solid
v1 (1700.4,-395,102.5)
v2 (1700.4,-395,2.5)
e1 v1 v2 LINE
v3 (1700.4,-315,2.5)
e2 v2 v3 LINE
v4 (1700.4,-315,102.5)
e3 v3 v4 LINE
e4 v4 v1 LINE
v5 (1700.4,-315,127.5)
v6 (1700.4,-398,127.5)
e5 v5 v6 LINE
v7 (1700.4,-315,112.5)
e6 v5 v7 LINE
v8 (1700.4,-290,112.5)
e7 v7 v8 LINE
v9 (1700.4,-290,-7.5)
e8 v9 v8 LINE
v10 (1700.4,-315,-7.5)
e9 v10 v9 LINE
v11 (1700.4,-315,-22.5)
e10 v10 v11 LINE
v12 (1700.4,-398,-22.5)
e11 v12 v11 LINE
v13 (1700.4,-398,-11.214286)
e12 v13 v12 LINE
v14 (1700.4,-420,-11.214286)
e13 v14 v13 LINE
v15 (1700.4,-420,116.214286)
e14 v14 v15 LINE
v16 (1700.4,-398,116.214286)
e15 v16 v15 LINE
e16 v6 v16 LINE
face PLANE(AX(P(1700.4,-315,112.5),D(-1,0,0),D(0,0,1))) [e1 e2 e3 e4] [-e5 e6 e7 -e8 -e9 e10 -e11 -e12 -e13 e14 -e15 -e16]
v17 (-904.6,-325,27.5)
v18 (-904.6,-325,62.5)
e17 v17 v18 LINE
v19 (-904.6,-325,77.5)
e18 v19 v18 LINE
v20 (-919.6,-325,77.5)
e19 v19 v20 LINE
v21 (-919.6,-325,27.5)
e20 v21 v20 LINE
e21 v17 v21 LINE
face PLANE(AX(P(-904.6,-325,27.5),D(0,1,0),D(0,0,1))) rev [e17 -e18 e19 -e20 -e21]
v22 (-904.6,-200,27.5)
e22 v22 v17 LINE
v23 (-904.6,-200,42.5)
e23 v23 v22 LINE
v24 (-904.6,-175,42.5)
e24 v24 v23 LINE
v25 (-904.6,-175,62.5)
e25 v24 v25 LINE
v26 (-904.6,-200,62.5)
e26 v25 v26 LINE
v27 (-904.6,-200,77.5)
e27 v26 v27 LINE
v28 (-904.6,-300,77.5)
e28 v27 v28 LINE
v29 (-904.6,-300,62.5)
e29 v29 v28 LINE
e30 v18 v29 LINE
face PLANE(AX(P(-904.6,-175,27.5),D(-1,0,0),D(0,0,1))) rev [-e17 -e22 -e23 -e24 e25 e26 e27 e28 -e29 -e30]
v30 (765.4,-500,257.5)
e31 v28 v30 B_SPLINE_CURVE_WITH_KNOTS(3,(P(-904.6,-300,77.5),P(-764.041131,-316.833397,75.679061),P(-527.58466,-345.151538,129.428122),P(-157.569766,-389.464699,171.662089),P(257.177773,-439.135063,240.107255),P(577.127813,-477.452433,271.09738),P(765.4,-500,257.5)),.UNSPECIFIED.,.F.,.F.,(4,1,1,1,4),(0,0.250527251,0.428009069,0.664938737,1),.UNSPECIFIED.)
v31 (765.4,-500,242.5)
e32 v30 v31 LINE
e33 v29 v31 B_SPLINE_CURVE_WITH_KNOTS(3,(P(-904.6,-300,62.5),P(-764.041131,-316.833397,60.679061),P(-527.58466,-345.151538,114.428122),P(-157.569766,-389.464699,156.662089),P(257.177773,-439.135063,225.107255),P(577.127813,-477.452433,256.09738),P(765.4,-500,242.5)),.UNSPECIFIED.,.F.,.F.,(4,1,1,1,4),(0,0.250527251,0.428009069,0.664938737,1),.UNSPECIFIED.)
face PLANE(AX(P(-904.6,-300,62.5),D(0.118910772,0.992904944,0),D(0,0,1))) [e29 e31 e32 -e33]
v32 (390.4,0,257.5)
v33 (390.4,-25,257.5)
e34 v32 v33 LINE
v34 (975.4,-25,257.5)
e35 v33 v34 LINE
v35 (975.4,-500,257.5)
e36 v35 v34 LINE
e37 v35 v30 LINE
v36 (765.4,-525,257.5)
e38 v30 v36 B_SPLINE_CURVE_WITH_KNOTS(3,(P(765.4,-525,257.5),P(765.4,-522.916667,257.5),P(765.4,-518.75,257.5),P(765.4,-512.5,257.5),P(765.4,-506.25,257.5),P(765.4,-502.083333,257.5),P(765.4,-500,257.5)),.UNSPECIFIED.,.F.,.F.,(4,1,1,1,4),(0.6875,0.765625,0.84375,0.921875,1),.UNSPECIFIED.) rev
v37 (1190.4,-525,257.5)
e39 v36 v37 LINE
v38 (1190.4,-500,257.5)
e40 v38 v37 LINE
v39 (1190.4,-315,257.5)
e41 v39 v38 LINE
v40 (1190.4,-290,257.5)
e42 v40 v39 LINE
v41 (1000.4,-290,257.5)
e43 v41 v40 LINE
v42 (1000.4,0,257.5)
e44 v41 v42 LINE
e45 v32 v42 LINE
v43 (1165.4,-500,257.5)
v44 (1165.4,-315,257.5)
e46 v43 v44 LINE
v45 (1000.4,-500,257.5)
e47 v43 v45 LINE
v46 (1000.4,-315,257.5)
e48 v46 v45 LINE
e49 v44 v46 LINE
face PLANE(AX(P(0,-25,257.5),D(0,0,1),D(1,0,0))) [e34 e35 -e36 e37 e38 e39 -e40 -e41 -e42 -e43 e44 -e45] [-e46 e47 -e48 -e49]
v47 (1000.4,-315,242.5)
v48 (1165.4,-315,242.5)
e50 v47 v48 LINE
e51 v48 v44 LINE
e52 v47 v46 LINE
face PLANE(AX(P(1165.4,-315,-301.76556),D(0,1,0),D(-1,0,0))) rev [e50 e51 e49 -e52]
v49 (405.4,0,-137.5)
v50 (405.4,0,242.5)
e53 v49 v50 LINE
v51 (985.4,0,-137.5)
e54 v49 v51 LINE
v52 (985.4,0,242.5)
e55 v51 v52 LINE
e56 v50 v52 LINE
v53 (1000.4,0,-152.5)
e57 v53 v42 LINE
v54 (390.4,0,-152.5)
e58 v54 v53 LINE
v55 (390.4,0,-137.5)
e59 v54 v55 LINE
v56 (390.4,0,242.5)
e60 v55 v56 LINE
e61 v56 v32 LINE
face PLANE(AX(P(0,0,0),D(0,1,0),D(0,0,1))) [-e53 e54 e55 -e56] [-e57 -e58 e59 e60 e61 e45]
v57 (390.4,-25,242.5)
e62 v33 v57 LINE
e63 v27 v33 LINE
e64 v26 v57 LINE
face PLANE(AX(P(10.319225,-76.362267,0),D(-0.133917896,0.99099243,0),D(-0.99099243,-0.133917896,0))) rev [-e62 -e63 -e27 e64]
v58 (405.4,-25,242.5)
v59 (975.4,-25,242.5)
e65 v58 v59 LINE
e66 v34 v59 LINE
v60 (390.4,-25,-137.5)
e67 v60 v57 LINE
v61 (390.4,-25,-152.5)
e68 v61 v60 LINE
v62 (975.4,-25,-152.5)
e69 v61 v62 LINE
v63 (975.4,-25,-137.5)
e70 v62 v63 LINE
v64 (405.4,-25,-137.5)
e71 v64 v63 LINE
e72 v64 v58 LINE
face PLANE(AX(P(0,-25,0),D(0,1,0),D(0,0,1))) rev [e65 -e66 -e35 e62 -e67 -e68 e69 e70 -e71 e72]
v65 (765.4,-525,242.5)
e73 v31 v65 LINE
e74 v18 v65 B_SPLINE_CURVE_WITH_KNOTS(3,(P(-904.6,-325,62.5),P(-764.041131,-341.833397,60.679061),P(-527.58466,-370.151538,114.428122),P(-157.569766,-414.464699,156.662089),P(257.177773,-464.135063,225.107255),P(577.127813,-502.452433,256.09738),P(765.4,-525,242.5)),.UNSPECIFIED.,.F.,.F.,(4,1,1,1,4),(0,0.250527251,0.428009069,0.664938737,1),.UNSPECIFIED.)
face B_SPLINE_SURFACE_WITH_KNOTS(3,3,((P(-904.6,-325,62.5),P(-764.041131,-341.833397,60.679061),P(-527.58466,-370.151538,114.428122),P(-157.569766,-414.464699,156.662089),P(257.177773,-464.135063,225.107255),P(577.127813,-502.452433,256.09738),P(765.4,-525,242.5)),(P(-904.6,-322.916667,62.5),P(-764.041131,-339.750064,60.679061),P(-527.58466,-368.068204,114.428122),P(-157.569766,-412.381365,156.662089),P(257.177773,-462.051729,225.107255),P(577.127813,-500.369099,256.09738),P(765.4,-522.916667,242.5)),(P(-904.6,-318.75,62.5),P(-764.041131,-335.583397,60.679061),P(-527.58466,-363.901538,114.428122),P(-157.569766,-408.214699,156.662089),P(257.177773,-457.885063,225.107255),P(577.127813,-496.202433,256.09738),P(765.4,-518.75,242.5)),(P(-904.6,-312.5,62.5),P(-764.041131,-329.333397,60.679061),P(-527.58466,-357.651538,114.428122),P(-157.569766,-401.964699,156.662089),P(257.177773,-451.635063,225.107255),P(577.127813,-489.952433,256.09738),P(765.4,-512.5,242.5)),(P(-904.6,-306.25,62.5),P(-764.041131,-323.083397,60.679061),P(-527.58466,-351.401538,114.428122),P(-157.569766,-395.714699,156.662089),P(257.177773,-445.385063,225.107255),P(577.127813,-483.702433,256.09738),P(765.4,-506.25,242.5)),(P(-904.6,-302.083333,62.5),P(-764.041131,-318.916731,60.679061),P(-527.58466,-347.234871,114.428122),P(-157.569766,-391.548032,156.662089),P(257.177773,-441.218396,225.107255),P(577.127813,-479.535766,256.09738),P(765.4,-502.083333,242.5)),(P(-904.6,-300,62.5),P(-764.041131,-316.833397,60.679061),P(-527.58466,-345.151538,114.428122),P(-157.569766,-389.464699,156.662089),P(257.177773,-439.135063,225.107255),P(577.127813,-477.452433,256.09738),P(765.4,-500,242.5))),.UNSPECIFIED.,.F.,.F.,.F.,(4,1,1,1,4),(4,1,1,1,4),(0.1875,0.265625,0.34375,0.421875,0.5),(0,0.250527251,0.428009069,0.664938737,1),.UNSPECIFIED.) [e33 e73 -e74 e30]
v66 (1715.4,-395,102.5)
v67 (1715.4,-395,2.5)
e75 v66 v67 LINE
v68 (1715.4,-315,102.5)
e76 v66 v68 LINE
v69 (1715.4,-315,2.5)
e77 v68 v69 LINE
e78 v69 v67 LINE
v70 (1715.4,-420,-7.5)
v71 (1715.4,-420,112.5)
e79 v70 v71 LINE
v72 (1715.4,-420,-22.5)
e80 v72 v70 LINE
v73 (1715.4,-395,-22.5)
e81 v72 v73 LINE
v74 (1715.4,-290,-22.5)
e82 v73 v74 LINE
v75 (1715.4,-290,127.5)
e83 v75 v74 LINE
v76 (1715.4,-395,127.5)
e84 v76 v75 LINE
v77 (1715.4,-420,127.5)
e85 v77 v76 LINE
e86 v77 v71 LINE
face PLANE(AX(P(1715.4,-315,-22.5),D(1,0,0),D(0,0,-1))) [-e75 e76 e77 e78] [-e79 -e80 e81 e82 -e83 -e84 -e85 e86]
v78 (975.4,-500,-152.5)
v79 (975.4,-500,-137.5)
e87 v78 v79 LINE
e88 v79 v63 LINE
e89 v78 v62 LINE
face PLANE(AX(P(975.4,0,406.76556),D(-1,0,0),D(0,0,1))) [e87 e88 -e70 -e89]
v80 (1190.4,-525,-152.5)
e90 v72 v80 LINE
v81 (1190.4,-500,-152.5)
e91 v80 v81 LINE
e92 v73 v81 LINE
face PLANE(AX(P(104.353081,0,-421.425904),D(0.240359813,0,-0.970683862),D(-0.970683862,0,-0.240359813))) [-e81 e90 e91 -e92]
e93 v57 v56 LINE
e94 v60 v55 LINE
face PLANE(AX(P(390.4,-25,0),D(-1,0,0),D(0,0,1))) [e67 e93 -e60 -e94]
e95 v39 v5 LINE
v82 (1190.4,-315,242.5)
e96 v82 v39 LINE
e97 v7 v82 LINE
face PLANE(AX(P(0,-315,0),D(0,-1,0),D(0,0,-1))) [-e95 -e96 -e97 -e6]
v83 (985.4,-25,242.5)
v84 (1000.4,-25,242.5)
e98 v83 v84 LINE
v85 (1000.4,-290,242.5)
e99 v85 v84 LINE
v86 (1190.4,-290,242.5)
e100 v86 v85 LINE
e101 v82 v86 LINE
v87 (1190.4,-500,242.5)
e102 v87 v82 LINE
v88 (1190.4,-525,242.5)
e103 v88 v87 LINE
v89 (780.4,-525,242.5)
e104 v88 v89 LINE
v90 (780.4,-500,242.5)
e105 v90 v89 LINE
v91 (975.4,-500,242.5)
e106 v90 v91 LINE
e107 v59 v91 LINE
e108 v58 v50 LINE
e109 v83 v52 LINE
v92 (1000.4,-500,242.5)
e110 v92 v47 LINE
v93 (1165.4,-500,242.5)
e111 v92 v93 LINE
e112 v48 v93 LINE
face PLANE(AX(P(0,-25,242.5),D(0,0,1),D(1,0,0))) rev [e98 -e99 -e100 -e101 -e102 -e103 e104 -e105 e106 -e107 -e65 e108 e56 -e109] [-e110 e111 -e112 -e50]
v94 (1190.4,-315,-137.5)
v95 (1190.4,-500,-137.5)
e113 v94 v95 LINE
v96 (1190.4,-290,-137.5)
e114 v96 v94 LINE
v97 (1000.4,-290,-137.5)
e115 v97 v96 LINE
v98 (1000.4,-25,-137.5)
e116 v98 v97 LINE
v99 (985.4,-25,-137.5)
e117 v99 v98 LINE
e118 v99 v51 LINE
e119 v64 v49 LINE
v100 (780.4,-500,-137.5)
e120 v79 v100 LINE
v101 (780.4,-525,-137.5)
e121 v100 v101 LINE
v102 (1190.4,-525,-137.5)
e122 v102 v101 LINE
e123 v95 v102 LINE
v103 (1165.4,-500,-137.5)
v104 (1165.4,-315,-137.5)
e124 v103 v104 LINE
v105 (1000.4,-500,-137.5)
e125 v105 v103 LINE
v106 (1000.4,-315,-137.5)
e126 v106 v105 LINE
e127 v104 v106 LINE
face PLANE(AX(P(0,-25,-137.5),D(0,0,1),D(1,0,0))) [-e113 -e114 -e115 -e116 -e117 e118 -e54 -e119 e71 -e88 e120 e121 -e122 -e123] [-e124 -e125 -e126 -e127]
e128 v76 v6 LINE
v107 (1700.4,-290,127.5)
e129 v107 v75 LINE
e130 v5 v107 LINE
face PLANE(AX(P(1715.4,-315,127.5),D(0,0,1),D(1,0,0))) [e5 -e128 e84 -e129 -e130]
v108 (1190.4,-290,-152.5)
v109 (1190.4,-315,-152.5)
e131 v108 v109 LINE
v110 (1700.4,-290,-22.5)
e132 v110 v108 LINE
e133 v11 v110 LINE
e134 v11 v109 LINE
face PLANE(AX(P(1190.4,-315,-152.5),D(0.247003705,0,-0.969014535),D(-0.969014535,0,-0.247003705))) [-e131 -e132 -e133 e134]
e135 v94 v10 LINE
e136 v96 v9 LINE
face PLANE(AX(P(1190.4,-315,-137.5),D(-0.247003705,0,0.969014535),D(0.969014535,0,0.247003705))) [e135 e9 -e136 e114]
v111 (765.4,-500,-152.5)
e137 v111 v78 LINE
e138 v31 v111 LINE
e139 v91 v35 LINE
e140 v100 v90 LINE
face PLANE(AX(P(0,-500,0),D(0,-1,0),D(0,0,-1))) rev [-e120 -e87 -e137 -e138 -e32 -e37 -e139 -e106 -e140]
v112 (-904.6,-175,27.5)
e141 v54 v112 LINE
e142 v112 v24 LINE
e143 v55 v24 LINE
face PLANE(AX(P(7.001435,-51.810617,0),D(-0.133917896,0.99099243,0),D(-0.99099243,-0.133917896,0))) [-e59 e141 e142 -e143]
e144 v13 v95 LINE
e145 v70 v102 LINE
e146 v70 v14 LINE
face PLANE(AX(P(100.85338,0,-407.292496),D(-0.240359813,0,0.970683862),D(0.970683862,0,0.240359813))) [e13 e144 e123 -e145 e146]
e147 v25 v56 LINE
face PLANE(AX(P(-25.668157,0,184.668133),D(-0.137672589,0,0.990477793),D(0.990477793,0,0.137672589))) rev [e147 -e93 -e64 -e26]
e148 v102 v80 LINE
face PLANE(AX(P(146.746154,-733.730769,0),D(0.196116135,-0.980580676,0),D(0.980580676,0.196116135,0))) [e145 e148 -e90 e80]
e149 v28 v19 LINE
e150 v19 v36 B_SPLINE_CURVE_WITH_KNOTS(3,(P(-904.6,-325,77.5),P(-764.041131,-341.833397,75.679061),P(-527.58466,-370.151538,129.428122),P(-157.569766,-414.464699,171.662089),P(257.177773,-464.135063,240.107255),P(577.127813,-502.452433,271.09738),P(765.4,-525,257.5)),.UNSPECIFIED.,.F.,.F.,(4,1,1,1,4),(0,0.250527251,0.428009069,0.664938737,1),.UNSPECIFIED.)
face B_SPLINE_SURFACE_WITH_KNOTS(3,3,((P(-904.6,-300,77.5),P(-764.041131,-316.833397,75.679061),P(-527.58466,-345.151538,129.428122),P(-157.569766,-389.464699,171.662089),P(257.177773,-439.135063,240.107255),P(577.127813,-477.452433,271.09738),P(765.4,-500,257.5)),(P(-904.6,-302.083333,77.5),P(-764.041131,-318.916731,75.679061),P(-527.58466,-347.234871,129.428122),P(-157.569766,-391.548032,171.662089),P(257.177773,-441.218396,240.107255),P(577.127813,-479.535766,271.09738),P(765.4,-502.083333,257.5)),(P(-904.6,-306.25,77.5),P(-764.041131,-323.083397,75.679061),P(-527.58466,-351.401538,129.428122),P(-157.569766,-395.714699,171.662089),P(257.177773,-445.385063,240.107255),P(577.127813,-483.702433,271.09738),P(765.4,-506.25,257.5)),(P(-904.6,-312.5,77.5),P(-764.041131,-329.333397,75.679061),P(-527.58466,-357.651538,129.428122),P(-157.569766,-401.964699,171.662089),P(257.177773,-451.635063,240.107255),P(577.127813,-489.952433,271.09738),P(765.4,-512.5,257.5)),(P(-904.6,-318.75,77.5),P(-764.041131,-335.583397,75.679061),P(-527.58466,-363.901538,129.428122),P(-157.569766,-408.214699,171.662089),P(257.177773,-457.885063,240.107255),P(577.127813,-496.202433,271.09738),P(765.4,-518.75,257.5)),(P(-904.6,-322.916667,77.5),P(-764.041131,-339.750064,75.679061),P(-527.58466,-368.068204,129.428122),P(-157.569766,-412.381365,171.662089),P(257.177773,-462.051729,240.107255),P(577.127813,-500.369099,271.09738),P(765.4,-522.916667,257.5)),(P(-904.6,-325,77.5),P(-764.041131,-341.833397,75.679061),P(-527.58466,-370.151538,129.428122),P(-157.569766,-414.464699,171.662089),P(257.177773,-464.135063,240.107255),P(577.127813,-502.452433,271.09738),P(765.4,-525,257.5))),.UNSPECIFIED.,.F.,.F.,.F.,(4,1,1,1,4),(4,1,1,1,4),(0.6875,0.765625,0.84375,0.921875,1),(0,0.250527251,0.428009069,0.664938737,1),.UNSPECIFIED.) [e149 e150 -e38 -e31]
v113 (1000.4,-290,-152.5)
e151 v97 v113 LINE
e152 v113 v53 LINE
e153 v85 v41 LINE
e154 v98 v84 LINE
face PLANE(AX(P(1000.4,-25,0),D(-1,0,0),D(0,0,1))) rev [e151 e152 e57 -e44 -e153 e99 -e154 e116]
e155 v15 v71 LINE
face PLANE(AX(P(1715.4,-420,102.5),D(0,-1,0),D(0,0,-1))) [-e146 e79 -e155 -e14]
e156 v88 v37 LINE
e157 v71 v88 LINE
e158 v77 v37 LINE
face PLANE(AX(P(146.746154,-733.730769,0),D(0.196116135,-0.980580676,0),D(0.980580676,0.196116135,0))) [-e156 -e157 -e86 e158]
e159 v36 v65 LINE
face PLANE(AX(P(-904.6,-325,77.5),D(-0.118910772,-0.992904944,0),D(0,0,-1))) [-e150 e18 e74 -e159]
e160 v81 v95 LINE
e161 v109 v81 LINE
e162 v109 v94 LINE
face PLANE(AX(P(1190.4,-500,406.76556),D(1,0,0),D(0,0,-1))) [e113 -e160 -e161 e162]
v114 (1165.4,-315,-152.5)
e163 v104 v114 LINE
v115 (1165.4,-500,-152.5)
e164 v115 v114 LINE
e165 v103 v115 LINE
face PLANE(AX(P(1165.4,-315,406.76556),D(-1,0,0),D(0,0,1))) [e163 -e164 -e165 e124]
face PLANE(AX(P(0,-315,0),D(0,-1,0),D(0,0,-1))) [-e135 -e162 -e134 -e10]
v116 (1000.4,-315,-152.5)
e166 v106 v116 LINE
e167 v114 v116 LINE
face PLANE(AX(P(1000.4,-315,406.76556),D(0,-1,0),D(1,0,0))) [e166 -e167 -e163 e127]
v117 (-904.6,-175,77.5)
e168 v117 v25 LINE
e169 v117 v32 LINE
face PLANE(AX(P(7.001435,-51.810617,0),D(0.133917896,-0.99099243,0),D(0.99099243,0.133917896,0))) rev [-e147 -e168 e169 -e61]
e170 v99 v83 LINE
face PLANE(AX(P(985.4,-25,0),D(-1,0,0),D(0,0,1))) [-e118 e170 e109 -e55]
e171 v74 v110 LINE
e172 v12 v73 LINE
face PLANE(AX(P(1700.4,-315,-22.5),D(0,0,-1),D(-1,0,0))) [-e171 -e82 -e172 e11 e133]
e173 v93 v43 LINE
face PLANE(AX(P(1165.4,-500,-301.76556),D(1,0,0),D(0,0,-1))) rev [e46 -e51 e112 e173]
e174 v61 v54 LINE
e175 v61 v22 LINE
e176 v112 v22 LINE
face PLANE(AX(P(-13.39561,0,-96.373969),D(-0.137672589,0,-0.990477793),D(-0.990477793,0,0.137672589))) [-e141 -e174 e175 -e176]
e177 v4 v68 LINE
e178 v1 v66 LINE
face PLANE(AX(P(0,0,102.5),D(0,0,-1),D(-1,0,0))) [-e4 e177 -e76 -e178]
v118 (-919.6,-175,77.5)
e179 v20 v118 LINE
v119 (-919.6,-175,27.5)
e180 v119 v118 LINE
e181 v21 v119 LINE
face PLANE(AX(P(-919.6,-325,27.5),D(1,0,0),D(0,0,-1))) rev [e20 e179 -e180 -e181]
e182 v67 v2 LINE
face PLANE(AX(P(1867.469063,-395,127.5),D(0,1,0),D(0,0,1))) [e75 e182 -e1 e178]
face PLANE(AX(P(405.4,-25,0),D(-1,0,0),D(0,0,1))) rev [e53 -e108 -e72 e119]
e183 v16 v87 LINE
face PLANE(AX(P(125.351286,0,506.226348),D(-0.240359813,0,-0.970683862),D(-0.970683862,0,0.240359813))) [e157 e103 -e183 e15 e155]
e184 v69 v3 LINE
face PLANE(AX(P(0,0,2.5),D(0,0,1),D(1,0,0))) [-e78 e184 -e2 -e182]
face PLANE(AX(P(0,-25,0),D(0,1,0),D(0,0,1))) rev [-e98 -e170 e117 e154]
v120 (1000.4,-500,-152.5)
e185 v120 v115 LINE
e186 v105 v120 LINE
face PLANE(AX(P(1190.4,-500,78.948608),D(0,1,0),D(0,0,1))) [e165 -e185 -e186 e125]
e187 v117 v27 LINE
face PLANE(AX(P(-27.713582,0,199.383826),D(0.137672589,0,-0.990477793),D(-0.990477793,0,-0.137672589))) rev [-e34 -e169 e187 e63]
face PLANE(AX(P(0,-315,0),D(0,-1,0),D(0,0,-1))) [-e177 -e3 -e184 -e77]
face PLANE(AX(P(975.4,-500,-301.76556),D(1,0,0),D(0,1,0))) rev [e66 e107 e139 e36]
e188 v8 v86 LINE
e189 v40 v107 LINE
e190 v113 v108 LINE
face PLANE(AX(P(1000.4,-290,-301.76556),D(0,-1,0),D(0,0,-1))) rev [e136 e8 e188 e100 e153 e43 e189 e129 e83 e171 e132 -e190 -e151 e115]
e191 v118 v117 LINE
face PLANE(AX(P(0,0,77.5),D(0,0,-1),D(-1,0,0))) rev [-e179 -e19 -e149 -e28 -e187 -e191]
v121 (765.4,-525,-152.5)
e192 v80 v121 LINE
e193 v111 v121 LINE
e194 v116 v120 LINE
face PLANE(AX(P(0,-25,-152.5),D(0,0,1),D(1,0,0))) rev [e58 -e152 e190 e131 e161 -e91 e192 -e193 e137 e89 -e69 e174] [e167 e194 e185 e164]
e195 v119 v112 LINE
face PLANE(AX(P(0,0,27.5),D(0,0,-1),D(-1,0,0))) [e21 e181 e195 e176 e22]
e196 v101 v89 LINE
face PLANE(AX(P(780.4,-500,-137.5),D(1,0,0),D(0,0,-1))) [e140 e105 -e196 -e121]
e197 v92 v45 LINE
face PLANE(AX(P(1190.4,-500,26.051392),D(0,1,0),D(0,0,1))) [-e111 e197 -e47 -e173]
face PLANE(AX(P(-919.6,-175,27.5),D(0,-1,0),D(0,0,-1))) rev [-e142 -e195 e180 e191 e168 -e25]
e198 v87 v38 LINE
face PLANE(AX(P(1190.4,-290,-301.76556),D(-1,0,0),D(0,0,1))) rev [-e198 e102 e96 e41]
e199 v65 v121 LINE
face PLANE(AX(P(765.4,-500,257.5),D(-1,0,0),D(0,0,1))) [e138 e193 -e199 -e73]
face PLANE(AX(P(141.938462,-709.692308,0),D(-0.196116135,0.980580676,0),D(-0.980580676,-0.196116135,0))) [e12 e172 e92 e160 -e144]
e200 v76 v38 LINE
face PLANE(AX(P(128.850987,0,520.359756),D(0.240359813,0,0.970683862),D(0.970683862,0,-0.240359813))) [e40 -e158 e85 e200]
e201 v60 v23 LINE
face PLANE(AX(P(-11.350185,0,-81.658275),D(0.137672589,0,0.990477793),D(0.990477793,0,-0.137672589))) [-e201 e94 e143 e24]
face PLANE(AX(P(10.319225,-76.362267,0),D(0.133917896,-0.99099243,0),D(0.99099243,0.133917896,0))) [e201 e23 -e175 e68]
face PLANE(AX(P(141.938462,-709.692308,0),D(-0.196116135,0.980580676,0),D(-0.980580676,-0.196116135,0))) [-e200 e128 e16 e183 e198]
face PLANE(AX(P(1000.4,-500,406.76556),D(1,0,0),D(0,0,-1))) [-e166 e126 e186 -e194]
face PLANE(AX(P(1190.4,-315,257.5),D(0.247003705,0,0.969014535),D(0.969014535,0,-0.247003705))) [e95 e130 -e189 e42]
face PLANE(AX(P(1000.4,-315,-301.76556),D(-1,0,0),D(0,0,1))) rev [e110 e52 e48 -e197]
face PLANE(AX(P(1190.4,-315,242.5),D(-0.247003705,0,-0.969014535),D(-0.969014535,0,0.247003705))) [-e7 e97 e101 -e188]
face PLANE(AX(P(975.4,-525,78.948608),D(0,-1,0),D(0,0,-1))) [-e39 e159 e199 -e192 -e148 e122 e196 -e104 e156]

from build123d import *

# Parameters (mm, degrees)
SKETCH1_W                 = 610
SKETCH1_H                 = 410
SKETCH1_W_2               = 580
SKETCH1_H_2               = 380
BOSS_EXTRUDE1_DEPTH       = 25
BOSS_EXTRUDE2_DEPTH       = 15
BOSS_EXTRUDE6_DEPTH       = 15
BOSS_EXTRUDE11_DEPTH      = 25
SKETCH8_W                 = 15
SKETCH8_H                 = 130
BOSS_EXTRUDE12_DEPTH      = 25
SKETCH9_W                 = 15
SKETCH9_H                 = 130
BOSS_EXTRUDE13_DEPTH      = 25
SKETCH10_W                = 150
SKETCH10_H                = 25
BOSS_EXTRUDE14_DEPTH      = 15
SKETCH13_W                = 215
SKETCH13_H                = 25
BOSS_EXTRUDE15_DEPTH      = 15
SKETCH14_W                = 215
SKETCH14_H                = 25
BOSS_EXTRUDE16_DEPTH      = 15
BOSS_EXTRUDE17_DEPTH      = 25
BOSS_EXTRUDE17_DEPTH_BACK = 25
BOSS_EXTRUDE17_START      = -205
SKETCH17_W                = 15
SKETCH17_H                = 150
BOSS_EXTRUDE18_DEPTH      = 25
LOFT13_START              = -525.0000001
LOFT13_DEPTH              = 225.0000002
LOFT13_START_2            = -152.5000001
LOFT13_2_DEPTH            = 415.5000001


with BuildPart() as part:
    # Sketch1 → Boss-Extrude1 (new body)
    with BuildSketch(Plane(origin=(0, 0, 0), x_dir=(1, 0, 0), z_dir=(0, 1, 0))):
        with Locations((695.4, -52.5)):
            Rectangle(SKETCH1_W, SKETCH1_H)
        with Locations((695.4, -52.5)):
            Rectangle(SKETCH1_W_2, SKETCH1_H_2, mode=Mode.SUBTRACT)
    extrude(amount=-BOSS_EXTRUDE1_DEPTH)

    # Sketch2 → Boss-Extrude2 (add)
    with BuildSketch(Plane.XY.offset(257.5)):
        Polygon((1000.4, 0), (1000.4, -290), (1190.4, -290), (1190.4, -500), (1165.4, -500), (1165.4, -315), (1000.4, -315), (1000.4, -500), (975.4, -500), (975.4, 0), align=None)
    extrude(amount=-BOSS_EXTRUDE2_DEPTH)

    # Sketch4 → Boss-Extrude6 (add)
    with BuildSketch(Plane(origin=(0, 0, -152.5), x_dir=(-1, 0, 0), z_dir=(0, 0, -1))):
        Polygon((-1000.4, -500), (-1000.4, -315), (-1165.4, -315), (-1165.4, -500), (-1190.4, -500), (-1190.4, -290), (-1000.4, -290), (-1000.4, 0), (-975.4, 0), (-975.4, -500), align=None)
    extrude(amount=-BOSS_EXTRUDE6_DEPTH)

    # Sketch6 → Boss-Extrude11 (add)
    with BuildSketch(Plane(origin=(0, -290, 0), x_dir=(1, 0, 0), z_dir=(0, 1, 0))):
        Polygon((1700.4, 22.5), (1715.4, 22.5), (1715.4, -52.5), (1715.4, -127.5), (1700.4, -127.5), (1190.4, -257.5), (1190.4, -242.5), (1700.4, -112.5), (1700.4, 7.5), (1190.4, 137.5), (1190.4, 152.5), align=None)
    extrude(amount=-BOSS_EXTRUDE11_DEPTH)

    # Sketch8 → Boss-Extrude12 (add)
    with BuildSketch(Plane.XY.offset(127.5)):
        with Locations((1707.9, -355)):
            Rectangle(SKETCH8_W, SKETCH8_H)
    extrude(amount=-BOSS_EXTRUDE12_DEPTH)

    # Sketch9 → Boss-Extrude13 (add)
    with BuildSketch(Plane(origin=(0, 0, -22.5), x_dir=(-1, 0, 0), z_dir=(0, 0, -1))):
        with Locations((-1707.9, -355)):
            Rectangle(SKETCH9_W, SKETCH9_H)
    extrude(amount=-BOSS_EXTRUDE13_DEPTH)

    # Sketch10 → Boss-Extrude14 (add)
    with BuildSketch(Plane.ZY.offset(-1700.4)):
        with Locations((52.5, -407.5)):
            Rectangle(SKETCH10_W, SKETCH10_H)
    extrude(amount=-BOSS_EXTRUDE14_DEPTH)

    # Sketch13 → Boss-Extrude15 (add)
    with BuildSketch(Plane(origin=(0, 0, -152.5), x_dir=(-1, 0, 0), z_dir=(0, 0, -1))):
        with Locations((-1082.9, -512.5)):
            Rectangle(SKETCH13_W, SKETCH13_H)
    extrude(amount=-BOSS_EXTRUDE15_DEPTH)

    # Sketch14 → Boss-Extrude16 (add)
    with BuildSketch(Plane.XY.offset(257.5)):
        with Locations((1082.9, -512.5)):
            Rectangle(SKETCH14_W, SKETCH14_H)
    extrude(amount=-BOSS_EXTRUDE16_DEPTH)

    # Sketch12 → Loft2 section 0
    with BuildSketch(Plane(origin=(1715.4, 0, 0), x_dir=(0, 0, -1), z_dir=(1, 0, 0))):
        with BuildLine():
            Line((22.5, -420), (22.5, -395))
            Line((22.5, -395), (7.5, -395))
            Line((7.5, -395), (7.5, -420))
            Line((7.5, -420), (22.5, -420))
        make_face()
    # Sketch15 → Loft2 section 1
    with BuildSketch(Plane(origin=(1190.4, 0, 0), x_dir=(0, 0, -1), z_dir=(1, 0, 0))):
        with BuildLine():
            Line((152.5, -525), (137.5, -525))
            Line((137.5, -525), (137.5, -500))
            Line((137.5, -500), (152.5, -500))
            Line((152.5, -500), (152.5, -525))
        make_face()
    loft()

    # Sketch18 → Loft3 section 0
    with BuildSketch(Plane(origin=(1715.4, 0, 0), x_dir=(0, 0, -1), z_dir=(1, 0, 0))):
        with BuildLine():
            Line((-127.5, -420), (-112.5, -420))
            Line((-112.5, -420), (-112.5, -395))
            Line((-112.5, -395), (-127.5, -395))
            Line((-127.5, -395), (-127.5, -420))
        make_face()
    # Sketch19 → Loft3 section 1
    with BuildSketch(Plane(origin=(1190.4, 0, 0), x_dir=(0, 0, -1), z_dir=(1, 0, 0))):
        with BuildLine():
            Line((-257.5, -525), (-242.5, -525))
            Line((-242.5, -525), (-242.5, -500))
            Line((-242.5, -500), (-257.5, -500))
            Line((-257.5, -500), (-257.5, -525))
        make_face()
    loft()



with BuildPart() as body_2:
    # Sketch17 → Boss-Extrude17 (new, two sides: drawn at the far end of the back side and taken through both)
    with BuildSketch(Plane.XY.offset(257.5).offset(BOSS_EXTRUDE17_START - BOSS_EXTRUDE17_DEPTH_BACK)):
        with Locations((-912.1, -250)):
            Rectangle(SKETCH17_W, SKETCH17_H)
    extrude(amount=BOSS_EXTRUDE17_DEPTH + BOSS_EXTRUDE17_DEPTH_BACK)


with BuildPart() as part_1:
    add(part.part)

    add(body_2.part)  # Loft6 merges body 2
    # Sketch21 → Loft6 section 0
    with BuildSketch(Plane(origin=(-904.6, 0, 0), x_dir=(0, 0, -1), z_dir=(1, 0, 0))):
        with BuildLine():
            Line((-77.5, -175), (-62.5, -175))
            Line((-62.5, -175), (-62.5, -200))
            Line((-62.5, -200), (-77.5, -200))
            Line((-77.5, -200), (-77.5, -175))
        make_face()
    # Sketch20 → Loft6 section 1
    with BuildSketch(Plane.ZY.offset(-390.4)):
        with BuildLine():
            Line((257.5, 0), (257.5, -25))
            Line((257.5, -25), (242.5, -25))
            Line((242.5, -25), (242.5, 0))
            Line((242.5, 0), (257.5, 0))
        make_face()
    loft()

    # Sketch23 → Loft7 section 0
    with BuildSketch(Plane.ZY.offset(-390.4)):
        with BuildLine():
            Line((-152.5, 0), (-137.5, 0))
            Line((-137.5, 0), (-137.5, -25))
            Line((-137.5, -25), (-152.5, -25))
            Line((-152.5, -25), (-152.5, 0))
        make_face()
    # Sketch22 → Loft7 section 1
    with BuildSketch(Plane(origin=(-904.6, 0, 0), x_dir=(0, 0, -1), z_dir=(1, 0, 0))):
        with BuildLine():
            Line((-27.5, -175), (-27.5, -200))
            Line((-27.5, -200), (-42.5, -200))
            Line((-42.5, -200), (-42.5, -175))
            Line((-42.5, -175), (-27.5, -175))
        make_face()
    loft()

    # Sketch24 → Boss-Extrude18 (add)
    with BuildSketch(Plane.XZ.offset(525)):
        Polygon((975.4, 257.5), (765.4, 257.5), (765.4, -152.5), (975.4, -152.5), (975.4, -137.5), (780.4, -137.5), (780.4, 242.5), (975.4, 242.5), align=None)
    extrude(amount=-BOSS_EXTRUDE18_DEPTH)

    # Loft13: read off the stored shape, not the designer's step
    # Loft13 outline → Loft13 (add)
    with BuildSketch(Plane(origin=(0, 0, 0), x_dir=(1, 0, 0), z_dir=(0, 1, 0)).offset(LOFT13_START)):
        with BuildLine():
            Line((-904.6, -62.5), (-904.6, -77.5))
            add(Edge.make_bspline(
                [(-904.6, -77.5), (-764.041130949, -75.679060612), (-527.584659858, -129.428121998), (-157.569765668, -171.662088503), (257.177772802, -240.107254931), (577.127812515, -271.097379608), (765.4, -257.5)],
                knots=[0, 0, 0, 0, 0.250527251, 0.428009069, 0.664938737, 1, 1, 1, 1], degree=3))
            Line((765.4, -257.5), (765.4, -242.5))
            add(Edge.make_bspline(
                [(-904.6, -62.5), (-764.041130949, -60.679060612), (-527.584659858, -114.428121998), (-157.569765668, -156.662088503), (257.177772802, -225.107254931), (577.127812515, -256.097379608), (765.4, -242.5)],
                knots=[0, 0, 0, 0, 0.250527251, 0.428009069, 0.664938737, 1, 1, 1, 1], degree=3))
        make_face()
    extrude(amount=LOFT13_DEPTH)

    # Loft13 2 outline → Loft13 2 (cut)
    with BuildSketch(Plane.XY.offset(LOFT13_START_2)):
        Polygon((-904.6, -300), (765.4, -500), (765.4, -299.9999999), align=None)
        Polygon((765.4, -525), (-904.6, -325), (-904.6, -525.0000001), align=None)
    extrude(amount=LOFT13_2_DEPTH, mode=Mode.SUBTRACT)


solid = part_1.part
